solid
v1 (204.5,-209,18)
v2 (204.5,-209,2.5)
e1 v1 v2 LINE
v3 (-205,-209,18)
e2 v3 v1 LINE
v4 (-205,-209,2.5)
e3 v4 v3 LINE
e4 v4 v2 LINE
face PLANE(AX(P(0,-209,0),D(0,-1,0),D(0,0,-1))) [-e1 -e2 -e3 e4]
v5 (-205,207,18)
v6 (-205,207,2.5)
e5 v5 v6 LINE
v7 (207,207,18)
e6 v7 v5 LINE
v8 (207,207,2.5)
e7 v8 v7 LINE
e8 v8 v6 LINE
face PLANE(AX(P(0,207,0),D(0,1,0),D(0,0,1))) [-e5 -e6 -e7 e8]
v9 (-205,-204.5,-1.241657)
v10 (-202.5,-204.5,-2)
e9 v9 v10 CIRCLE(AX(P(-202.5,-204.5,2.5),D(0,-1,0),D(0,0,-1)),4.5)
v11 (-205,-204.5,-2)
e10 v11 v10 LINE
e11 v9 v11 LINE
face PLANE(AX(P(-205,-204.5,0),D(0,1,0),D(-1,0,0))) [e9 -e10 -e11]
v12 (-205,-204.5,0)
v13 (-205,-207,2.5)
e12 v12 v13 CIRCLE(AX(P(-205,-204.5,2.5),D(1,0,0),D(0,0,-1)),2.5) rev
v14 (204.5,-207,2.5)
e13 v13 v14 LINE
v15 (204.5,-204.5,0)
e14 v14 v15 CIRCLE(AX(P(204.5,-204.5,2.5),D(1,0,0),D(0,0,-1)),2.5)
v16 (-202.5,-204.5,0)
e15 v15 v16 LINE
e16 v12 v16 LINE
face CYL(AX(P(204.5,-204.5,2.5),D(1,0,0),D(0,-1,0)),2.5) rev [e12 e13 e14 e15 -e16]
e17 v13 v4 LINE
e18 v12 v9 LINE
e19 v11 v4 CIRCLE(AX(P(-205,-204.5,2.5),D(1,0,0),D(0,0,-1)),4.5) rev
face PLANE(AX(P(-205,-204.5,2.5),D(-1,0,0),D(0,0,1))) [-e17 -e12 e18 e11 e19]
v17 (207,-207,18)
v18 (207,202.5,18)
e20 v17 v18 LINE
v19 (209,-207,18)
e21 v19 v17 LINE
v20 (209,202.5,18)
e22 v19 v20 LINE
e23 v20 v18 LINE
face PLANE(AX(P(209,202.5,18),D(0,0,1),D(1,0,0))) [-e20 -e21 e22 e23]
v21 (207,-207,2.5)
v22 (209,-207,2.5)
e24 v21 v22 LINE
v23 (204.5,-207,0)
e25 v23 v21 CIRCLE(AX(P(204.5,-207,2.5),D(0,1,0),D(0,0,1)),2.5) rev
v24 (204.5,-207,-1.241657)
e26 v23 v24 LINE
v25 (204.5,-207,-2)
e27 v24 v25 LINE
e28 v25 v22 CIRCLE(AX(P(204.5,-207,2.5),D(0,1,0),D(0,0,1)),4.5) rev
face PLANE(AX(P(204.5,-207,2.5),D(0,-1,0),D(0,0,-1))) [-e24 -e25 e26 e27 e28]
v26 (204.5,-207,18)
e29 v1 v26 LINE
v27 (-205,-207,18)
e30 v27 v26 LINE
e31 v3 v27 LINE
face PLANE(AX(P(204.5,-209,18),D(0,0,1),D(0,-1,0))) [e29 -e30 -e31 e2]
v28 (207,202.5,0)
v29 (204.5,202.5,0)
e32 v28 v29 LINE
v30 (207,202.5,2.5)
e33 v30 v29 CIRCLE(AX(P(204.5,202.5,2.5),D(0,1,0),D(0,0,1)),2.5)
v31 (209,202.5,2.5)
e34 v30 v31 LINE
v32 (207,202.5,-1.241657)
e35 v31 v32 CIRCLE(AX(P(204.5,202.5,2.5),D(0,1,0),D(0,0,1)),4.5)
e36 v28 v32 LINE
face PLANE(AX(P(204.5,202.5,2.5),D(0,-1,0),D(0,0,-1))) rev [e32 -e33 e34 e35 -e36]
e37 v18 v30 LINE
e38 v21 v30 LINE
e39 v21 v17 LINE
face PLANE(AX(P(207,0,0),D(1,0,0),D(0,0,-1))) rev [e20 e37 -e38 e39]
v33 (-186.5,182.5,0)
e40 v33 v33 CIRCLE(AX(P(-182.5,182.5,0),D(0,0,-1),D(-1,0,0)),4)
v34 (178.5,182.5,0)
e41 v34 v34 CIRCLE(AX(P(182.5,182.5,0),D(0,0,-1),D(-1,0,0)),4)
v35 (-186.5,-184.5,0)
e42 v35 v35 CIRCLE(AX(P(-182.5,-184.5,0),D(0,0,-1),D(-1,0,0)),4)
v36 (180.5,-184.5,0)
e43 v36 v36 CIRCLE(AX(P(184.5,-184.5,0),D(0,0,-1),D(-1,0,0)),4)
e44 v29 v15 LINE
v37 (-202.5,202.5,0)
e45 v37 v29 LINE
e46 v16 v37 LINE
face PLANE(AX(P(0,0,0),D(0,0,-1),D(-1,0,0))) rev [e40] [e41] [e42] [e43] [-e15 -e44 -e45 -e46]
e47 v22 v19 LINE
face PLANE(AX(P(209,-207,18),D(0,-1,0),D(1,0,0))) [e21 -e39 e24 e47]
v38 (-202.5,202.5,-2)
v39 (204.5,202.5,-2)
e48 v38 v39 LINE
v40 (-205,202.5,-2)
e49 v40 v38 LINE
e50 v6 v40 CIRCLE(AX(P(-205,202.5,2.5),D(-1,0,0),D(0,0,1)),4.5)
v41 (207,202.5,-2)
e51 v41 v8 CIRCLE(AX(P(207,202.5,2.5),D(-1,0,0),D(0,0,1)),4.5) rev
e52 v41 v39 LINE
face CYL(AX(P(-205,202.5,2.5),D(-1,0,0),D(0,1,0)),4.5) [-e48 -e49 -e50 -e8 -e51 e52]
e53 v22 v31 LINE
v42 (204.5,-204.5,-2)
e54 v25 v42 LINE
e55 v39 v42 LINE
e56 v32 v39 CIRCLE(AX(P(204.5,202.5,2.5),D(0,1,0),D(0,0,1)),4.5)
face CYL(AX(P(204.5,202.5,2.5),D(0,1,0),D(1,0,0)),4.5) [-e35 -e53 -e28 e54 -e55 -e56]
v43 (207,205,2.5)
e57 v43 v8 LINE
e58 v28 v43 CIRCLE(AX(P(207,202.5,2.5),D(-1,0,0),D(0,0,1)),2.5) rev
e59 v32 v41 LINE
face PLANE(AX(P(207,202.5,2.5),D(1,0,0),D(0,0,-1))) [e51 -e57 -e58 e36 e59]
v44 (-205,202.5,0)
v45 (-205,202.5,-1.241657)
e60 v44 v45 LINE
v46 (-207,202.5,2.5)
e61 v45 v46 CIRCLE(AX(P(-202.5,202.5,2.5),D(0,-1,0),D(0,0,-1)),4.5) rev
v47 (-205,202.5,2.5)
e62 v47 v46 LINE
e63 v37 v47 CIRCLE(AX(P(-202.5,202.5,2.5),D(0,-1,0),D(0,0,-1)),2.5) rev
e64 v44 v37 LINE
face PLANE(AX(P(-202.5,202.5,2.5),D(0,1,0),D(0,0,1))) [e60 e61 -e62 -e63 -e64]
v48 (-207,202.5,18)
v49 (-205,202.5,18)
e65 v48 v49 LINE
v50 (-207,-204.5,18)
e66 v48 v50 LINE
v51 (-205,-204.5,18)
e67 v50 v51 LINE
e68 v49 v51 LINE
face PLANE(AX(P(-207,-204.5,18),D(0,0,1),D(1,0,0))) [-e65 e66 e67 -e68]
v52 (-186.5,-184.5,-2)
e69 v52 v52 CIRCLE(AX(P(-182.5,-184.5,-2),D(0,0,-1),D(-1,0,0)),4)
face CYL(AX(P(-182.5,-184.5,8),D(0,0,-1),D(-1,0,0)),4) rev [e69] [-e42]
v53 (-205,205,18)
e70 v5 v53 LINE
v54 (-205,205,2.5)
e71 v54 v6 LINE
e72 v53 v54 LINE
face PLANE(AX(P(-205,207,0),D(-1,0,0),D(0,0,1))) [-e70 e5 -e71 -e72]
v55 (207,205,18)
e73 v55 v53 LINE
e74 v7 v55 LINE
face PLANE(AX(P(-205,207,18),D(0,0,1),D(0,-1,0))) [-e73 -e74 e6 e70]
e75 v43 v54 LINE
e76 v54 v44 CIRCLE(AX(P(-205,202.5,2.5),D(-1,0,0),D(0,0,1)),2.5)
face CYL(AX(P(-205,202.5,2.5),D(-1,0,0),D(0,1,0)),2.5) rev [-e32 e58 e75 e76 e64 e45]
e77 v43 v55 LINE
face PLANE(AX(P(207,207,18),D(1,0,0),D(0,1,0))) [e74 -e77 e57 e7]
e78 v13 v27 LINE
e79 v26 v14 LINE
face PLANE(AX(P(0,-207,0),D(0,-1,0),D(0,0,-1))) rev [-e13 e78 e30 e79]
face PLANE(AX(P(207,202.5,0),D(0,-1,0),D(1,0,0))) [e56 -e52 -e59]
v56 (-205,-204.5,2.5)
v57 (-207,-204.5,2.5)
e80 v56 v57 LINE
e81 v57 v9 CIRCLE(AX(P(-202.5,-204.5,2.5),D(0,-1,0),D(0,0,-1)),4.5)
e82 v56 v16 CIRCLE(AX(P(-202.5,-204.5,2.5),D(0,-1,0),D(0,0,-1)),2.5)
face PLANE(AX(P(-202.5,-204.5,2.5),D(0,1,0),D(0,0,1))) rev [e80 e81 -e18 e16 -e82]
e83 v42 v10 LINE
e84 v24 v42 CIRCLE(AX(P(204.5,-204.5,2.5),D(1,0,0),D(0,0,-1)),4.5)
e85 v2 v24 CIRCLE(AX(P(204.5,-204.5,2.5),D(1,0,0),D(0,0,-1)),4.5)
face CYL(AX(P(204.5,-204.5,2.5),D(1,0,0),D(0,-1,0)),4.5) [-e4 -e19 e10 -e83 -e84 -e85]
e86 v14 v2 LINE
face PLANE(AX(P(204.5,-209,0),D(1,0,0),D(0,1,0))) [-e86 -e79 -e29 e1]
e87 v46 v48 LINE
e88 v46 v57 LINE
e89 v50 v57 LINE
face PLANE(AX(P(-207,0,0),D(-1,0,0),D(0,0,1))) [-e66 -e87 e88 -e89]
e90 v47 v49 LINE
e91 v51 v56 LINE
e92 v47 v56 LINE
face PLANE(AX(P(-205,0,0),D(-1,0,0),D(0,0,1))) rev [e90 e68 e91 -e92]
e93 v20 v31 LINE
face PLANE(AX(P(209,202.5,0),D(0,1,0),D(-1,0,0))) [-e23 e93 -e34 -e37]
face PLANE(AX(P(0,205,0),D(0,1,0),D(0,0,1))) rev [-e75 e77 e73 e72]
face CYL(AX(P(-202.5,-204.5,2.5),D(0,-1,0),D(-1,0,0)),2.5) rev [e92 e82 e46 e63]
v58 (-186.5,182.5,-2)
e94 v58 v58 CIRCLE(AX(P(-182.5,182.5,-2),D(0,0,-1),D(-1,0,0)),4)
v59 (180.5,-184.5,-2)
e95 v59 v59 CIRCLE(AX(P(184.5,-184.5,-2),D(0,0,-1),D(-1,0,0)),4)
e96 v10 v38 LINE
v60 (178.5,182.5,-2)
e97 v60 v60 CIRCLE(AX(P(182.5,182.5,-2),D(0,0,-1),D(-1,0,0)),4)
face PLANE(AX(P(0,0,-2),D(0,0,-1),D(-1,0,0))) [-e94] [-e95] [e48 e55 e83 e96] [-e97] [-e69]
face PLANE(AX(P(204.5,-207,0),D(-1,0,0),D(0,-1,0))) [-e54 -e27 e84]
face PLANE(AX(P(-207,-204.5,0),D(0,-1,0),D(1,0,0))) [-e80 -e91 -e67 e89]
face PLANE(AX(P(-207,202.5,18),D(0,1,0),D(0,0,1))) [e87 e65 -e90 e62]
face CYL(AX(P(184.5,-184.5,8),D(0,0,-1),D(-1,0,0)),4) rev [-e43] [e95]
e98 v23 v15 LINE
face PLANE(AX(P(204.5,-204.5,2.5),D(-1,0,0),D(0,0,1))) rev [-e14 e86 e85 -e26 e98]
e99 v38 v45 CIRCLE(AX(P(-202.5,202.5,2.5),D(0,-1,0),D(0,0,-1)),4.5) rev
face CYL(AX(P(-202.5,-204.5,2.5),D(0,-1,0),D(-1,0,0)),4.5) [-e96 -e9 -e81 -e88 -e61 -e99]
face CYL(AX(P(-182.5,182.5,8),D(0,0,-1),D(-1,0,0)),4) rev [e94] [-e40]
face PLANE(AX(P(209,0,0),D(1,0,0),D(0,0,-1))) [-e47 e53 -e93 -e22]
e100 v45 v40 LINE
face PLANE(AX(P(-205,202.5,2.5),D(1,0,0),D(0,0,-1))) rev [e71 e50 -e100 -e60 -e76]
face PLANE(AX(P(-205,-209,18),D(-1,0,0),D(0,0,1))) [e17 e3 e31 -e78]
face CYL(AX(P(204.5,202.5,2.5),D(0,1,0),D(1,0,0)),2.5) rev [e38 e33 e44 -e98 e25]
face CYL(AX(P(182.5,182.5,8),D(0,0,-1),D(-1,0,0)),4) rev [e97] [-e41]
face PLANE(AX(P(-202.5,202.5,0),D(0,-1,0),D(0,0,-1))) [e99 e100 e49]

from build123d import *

# Parameters (mm, degrees)
SKETCH1_W                    = 412
SKETCH1_H                    = 412
BASE_FLANGE1_DEPTH           = 2
EDGE_FLANGE1_STRIP_W         = 13
EDGE_FLANGE1_STRIP_H         = 2
EDGE_FLANGE1_STRIP_CUT_DEPTH = 412
EDGE_FLANGE1_DEPTH           = 412
EDGE_FLANGE2_STRIP_W         = 13
EDGE_FLANGE2_STRIP_H         = 2
EDGE_FLANGE2_STRIP_CUT_DEPTH = 409.5
EDGE_FLANGE2_DEPTH           = 409.5
EDGE_FLANGE3_STRIP_W         = 13
EDGE_FLANGE3_STRIP_H         = 2
EDGE_FLANGE3_STRIP_CUT_DEPTH = 409.5
EDGE_FLANGE3_DEPTH           = 409.5
EDGE_FLANGE4_STRIP_W         = 13
EDGE_FLANGE4_STRIP_H         = 2
EDGE_FLANGE4_STRIP_CUT_DEPTH = 407
EDGE_FLANGE4_DEPTH           = 407
SKETCH18_R                   = 4
CUT_EXTRUDE1_DEPTH           = 10


# Sheet-metal steps are written as plain solids
with BuildPart() as part:
    # Sketch1 → Base-Flange1 (new body)
    with BuildSketch(Plane.XY):
        with Locations((1, -1)):
            Rectangle(SKETCH1_W, SKETCH1_H)
    extrude(amount=-BASE_FLANGE1_DEPTH)

    # Edge-Flange1 strip (across the edge) → Edge-Flange1 strip cut (cut)
    with BuildSketch(Plane(origin=(207, 205, 0), x_dir=(0, -1, 0), z_dir=(-1, 0, 0))):
        with Locations((-4, -1)):
            Rectangle(EDGE_FLANGE1_STRIP_W, EDGE_FLANGE1_STRIP_H)
    extrude(amount=EDGE_FLANGE1_STRIP_CUT_DEPTH, mode=Mode.SUBTRACT)

    # Edge-Flange1 section (across the edge) → Edge-Flange1 (add)
    with BuildSketch(Plane(origin=(207, 205, 0), x_dir=(0, -1, 0), z_dir=(-1, 0, 0))):
        with BuildLine():
            Line((-2, 2.5), (-2, 18))
            Line((-2, 18), (0, 18))
            Line((0, 18), (0, 2.5))
            ThreePointArc((0, 2.5), (0.732233047, 0.732233047), (2.5, 0))
            Line((2.5, 0), (2.5, -2))
            ThreePointArc((2.5, -2), (-0.681980515, -0.681980515), (-2, 2.5))
        make_face()
    extrude(amount=EDGE_FLANGE1_DEPTH)

    # Edge-Flange2 strip (across the edge) → Edge-Flange2 strip cut (cut)
    with BuildSketch(Plane(origin=(207, -207, 0), x_dir=(-1, 0, 0), z_dir=(0, 1, 0))):
        with Locations((-4, -1)):
            Rectangle(EDGE_FLANGE2_STRIP_W, EDGE_FLANGE2_STRIP_H)
    extrude(amount=EDGE_FLANGE2_STRIP_CUT_DEPTH, mode=Mode.SUBTRACT)

    # Edge-Flange2 section (across the edge) → Edge-Flange2 (add)
    with BuildSketch(Plane(origin=(207, -207, 0), x_dir=(-1, 0, 0), z_dir=(0, 1, 0))):
        with BuildLine():
            Line((-2, 2.5), (-2, 18))
            Line((-2, 18), (0, 18))
            Line((0, 18), (0, 2.5))
            ThreePointArc((0, 2.5), (0.732233047, 0.732233047), (2.5, 0))
            Line((2.5, 0), (2.5, -2))
            ThreePointArc((2.5, -2), (-0.681980515, -0.681980515), (-2, 2.5))
        make_face()
    extrude(amount=EDGE_FLANGE2_DEPTH)

    # Edge-Flange3 strip (across the edge) → Edge-Flange3 strip cut (cut)
    with BuildSketch(Plane(origin=(-205, -207, 0), x_dir=(0, 1, 0), z_dir=(1, 0, 0))):
        with Locations((-4, -1)):
            Rectangle(EDGE_FLANGE3_STRIP_W, EDGE_FLANGE3_STRIP_H)
    extrude(amount=EDGE_FLANGE3_STRIP_CUT_DEPTH, mode=Mode.SUBTRACT)

    # Edge-Flange3 section (across the edge) → Edge-Flange3 (add)
    with BuildSketch(Plane(origin=(-205, -207, 0), x_dir=(0, 1, 0), z_dir=(1, 0, 0))):
        with BuildLine():
            Line((-2, 2.5), (-2, 18))
            Line((-2, 18), (0, 18))
            Line((0, 18), (0, 2.5))
            ThreePointArc((0, 2.5), (0.732233047, 0.732233047), (2.5, 0))
            Line((2.5, 0), (2.5, -2))
            ThreePointArc((2.5, -2), (-0.681980515, -0.681980515), (-2, 2.5))
        make_face()
    extrude(amount=EDGE_FLANGE3_DEPTH)

    # Edge-Flange4 strip (across the edge) → Edge-Flange4 strip cut (cut)
    with BuildSketch(Plane(origin=(-205, 202.5, 0), x_dir=(1, 0, 0), z_dir=(0, -1, 0))):
        with Locations((-4, -1)):
            Rectangle(EDGE_FLANGE4_STRIP_W, EDGE_FLANGE4_STRIP_H)
    extrude(amount=EDGE_FLANGE4_STRIP_CUT_DEPTH, mode=Mode.SUBTRACT)

    # Edge-Flange4 section (across the edge) → Edge-Flange4 (add)
    with BuildSketch(Plane(origin=(-205, 202.5, 0), x_dir=(1, 0, 0), z_dir=(0, -1, 0))):
        with BuildLine():
            Line((-2, 2.5), (-2, 18))
            Line((-2, 18), (0, 18))
            Line((0, 18), (0, 2.5))
            ThreePointArc((0, 2.5), (0.732233047, 0.732233047), (2.5, 0))
            Line((2.5, 0), (2.5, -2))
            ThreePointArc((2.5, -2), (-0.681980515, -0.681980515), (-2, 2.5))
        make_face()
    extrude(amount=EDGE_FLANGE4_DEPTH)

    # Sketch18 → Cut-Extrude1 (cut)
    with BuildSketch(Plane(origin=(0, 0, -2), x_dir=(-1, 0, 0), z_dir=(0, 0, -1))):
        with Locations((-184.5, -184.5)):
            Circle(SKETCH18_R)
        with Locations((182.5, -184.5)):
            Circle(SKETCH18_R)
        with Locations((182.5, 182.5)):
            Circle(SKETCH18_R)
        with Locations((-182.5, 182.5)):
            Circle(SKETCH18_R)
    extrude(amount=-CUT_EXTRUDE1_DEPTH, mode=Mode.SUBTRACT)


solid = part.part
